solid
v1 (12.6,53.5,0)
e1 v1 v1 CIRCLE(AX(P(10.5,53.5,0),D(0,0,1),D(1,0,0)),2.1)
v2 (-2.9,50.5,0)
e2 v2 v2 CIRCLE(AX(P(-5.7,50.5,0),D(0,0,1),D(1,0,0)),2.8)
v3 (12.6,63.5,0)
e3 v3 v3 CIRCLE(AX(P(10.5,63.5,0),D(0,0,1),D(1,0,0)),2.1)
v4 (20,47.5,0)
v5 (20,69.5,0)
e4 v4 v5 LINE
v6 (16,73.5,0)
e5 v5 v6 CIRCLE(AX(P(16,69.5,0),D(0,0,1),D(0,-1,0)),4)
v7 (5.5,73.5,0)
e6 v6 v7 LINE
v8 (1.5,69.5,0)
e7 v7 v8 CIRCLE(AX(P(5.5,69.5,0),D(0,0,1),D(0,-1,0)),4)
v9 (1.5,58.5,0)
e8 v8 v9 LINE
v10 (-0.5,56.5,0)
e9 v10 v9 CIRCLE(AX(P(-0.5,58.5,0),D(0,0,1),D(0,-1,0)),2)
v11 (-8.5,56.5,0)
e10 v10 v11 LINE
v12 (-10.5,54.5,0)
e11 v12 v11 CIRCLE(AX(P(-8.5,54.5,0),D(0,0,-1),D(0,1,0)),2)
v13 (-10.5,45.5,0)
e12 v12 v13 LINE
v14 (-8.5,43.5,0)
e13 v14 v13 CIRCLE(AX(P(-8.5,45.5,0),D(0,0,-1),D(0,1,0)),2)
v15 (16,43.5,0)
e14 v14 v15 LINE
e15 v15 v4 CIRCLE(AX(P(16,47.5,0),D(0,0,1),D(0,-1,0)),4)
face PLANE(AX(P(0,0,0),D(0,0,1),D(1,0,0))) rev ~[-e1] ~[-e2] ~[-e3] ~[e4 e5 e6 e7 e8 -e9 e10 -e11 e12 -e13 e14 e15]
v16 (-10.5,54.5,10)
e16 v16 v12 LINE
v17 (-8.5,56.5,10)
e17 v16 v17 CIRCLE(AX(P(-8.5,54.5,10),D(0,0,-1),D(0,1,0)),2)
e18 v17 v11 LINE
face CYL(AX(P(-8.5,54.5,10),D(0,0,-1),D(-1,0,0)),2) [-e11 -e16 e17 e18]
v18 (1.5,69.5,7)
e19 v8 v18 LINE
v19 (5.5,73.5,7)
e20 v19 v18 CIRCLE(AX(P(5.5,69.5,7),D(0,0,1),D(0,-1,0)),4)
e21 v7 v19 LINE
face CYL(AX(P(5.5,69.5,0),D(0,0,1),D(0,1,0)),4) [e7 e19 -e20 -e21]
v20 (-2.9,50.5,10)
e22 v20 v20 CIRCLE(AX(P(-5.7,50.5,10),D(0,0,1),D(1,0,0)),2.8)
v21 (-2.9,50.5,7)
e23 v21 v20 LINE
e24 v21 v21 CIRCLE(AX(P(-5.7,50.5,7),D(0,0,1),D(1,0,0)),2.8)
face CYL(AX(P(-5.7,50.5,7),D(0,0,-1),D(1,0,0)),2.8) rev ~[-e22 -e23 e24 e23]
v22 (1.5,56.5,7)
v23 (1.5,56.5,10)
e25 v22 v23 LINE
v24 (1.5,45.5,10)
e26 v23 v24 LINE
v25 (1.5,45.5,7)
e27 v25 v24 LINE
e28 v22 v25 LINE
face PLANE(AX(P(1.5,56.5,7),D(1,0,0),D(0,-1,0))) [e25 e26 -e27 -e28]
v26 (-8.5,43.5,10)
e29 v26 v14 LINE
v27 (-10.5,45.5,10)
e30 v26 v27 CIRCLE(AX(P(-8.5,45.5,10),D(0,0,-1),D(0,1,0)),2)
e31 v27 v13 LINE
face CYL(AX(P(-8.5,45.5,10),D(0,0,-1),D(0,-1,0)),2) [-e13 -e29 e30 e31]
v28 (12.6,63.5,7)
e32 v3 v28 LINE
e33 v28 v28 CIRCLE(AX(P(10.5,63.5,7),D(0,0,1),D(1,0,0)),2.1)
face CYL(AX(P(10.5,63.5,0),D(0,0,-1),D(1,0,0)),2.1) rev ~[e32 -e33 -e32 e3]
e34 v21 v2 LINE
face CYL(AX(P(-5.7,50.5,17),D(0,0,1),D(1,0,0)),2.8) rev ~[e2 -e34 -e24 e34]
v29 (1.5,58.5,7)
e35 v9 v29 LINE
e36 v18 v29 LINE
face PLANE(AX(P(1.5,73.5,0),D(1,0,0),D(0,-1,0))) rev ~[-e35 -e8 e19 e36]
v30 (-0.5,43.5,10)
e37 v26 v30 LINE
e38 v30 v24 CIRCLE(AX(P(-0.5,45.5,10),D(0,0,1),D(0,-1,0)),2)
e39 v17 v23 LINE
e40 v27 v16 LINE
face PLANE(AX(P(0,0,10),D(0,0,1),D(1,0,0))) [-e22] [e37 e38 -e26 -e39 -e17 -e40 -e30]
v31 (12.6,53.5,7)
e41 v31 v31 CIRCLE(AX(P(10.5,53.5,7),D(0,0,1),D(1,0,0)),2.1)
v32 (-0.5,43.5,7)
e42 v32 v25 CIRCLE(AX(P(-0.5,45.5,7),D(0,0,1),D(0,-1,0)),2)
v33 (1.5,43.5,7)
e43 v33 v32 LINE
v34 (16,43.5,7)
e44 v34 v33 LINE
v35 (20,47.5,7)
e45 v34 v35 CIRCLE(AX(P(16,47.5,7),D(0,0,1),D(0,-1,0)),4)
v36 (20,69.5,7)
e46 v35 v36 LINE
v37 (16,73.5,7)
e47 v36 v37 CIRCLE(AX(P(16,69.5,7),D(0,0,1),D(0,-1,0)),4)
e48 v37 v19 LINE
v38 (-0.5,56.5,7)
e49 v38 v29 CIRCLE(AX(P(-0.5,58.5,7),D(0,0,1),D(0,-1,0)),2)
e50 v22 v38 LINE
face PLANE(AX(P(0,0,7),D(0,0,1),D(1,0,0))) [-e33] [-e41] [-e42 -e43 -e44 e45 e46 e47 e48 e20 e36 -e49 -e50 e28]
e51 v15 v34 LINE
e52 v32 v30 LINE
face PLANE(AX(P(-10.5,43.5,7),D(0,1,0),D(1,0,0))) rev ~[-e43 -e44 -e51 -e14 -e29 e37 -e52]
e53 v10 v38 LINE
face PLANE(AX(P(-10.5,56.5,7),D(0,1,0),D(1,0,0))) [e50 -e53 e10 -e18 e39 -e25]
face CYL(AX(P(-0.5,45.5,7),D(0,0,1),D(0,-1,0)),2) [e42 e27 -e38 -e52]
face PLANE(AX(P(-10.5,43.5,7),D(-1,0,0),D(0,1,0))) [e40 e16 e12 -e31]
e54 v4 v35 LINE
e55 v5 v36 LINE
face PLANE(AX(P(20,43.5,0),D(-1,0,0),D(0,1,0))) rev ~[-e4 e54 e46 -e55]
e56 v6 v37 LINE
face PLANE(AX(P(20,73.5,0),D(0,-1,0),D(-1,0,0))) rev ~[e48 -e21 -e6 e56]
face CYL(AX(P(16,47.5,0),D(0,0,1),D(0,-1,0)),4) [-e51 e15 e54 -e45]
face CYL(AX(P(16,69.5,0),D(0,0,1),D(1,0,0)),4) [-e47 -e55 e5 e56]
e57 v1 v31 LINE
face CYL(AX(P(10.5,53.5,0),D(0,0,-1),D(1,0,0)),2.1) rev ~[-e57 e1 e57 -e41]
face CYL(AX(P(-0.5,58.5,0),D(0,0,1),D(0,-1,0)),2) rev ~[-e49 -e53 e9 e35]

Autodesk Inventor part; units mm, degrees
ref_plane "YZ Plane" through (0, 0, 0) normal (1, 0, 0) x (0, 1, 0)
ref_plane "XZ Plane" through (0, 0, 0) normal (0, 1, 0) x (-1, 0, 0)
ref_plane "XY Plane" through (0, 0, 0) normal (0, 0, 1) x (1, 0, 0)
ref_plane "Work Plane1" through (0, 0, 0) normal (0, 0, 1) x (1, 0, 0)
ref_plane "Work Plane2" through (0, 0, 0) normal (0, 0, 1) x (1, 0, 0)
sketch "Sketch6" plane through (0, 0, 0) normal (0, 0, 1) x (1, 0, 0)
  line L0 (20, 33.25) -> (1.5, 33.25) projected
  line L1 (20, 33.25) -> (20, 108.5) projected
  line L2 (1.5, 108.5) -> (20, 108.5) projected
  line L3 (1.5, 33.25) -> (1.5, 44.75) projected
  circle A0 centre (10.5, 63.5) radius 2.1 projected
  circle A1 centre (10.5, 53.5) radius 2.1 projected
  line L4 (20, 73.5) -> (-19.5, 73.5)
  line L5 (-19.5, 73.5) -> (-19.5, 43.5)
  line L6 (-19.5, 43.5) -> (20, 43.5)
  line L7 (20, 43.5) -> (20, 73.5)
  line L8 (-71.5, 45.5) -> (-71.5, 108.5) projected
  line L9 (-19.5, 73.5) -> (1.5, 73.5)
  line L10 (1.5, 73.5) -> (1.5, 56.5)
  line L11 (1.5, 56.5) -> (-19.5, 56.5)
  line L12 (-19.5, 56.5) -> (-19.5, 73.5)
  line L13 (-10.5, 43.5) -> (-19.5, 43.5)
  line L14 (-19.5, 43.5) -> (-19.5, 56.5)
  line L15 (-19.5, 56.5) -> (-10.5, 56.5)
  line L16 (-10.5, 56.5) -> (-10.5, 43.5)
  line L17 (4.5, 44.75) -> (1.5, 44.75) projected
  line L18 (1.5, 56.25) -> (1.5, 108.5) projected
  line L19 (1.5, 56.25) -> (4.5, 56.25) projected
  line L20 (4.5, 56.25) -> (4.5, 44.75) projected
  point P0 (0, 0)
  point P1 (20, 43.5)
  point P2 (-71.5, 60.5)
  point P3 (1.5, 73.5)
  point P4 (1.5, 43.5)
  point P5 (1.5, 73.5)
  point P6 (1.5, 73.5)
  dimension "d28" = 10
  dimension "d29" = 10
  dimension "d92" = 30
  dimension "d94" = 17
  dimension "d95" = 9
extrude "Extrusion5" add sketch "Sketch6" along normal blind 7 contours L6 L3 L17 L20 L19 L18 L10 L4 L1 | L6 L16 L11 L18 L19 L20 L17 L3
ref_plane "Work Plane3" through (0, 0, 22) normal (0, 0, 1) x (1, 0, 0)
ref_plane "Work Plane4" through (0, 0, 17) normal (0, 0, 1) x (1, 0, 0)
sketch "Sketch17" plane through (0, 0, 17) normal (0, 0, 1) x (1, 0, 0)
  line L0 (-13, 58.5) -> (0, 58.5) projected
  line L1 (0, 58.5) -> (0, 88.5) projected
  line L2 (0, 88.5) -> (-13, 88.5) projected
  line L3 (-13, 88.5) -> (-13, 58.5) projected
  circle A0 centre (-5.7, 50.5) radius 2.8
  line L4 (1.5, 56.5) -> (-10.5, 56.5) projected
  line L5 (20, 43.5) -> (20, 73.5) projected
  line L6 (20, 73.5) -> (1.5, 73.5) projected
  line L7 (-10.5, 43.5) -> (20, 43.5) projected
  line L8 (-10.5, 56.5) -> (-10.5, 43.5) projected
  line L9 (1.5, 73.5) -> (1.5, 56.5) projected
  line L10 (1.5, 56.5) -> (-10.5, 56.5) projected
  point P0 (0, 0)
  point P1 (-6.5, 58.5)
  dimension "d75" = 7.3
  dimension "d88" = 5.6
  dimension "d103" = 7
extrude "Extrusion16" cut sketch "Sketch17" against normal through all contours A0
fillet "Fillet8" radius 4 3 edges at (20, 73.5, 3.5) (20, 43.5, 3.5) (1.5, 73.5, 3.5)
sketch "Sketch19" plane through (0, 0, 7) normal (0, 0, 1) x (1, 0, 0)
  line L0 (20, 47.5) -> (20, 69.5) projected
  line L1 (16, 73.5) -> (5.5, 73.5) projected
  line L2 (-10.5, 43.5) -> (16, 43.5) projected
  line L3 (-10.5, 43.5) -> (16, 43.5) projected
  line L4 (-10.5, 56.5) -> (1.5, 56.5)
  line L5 (1.5, 56.5) -> (1.5, 43.5)
  line L6 (1.5, 43.5) -> (-10.5, 43.5)
  line L7 (-10.5, 43.5) -> (-10.5, 56.5)
  circle A0 centre (-5.7, 50.5) radius 2.8 projected
  arc A1 (16, 43.5) -> (20, 47.5) centre (16, 47.5) ccw projected
  arc A2 (20, 69.5) -> (16, 73.5) centre (16, 69.5) ccw projected
  line L8 (1.5, 69.5) -> (1.5, 56.5) projected
  line L9 (1.5, 56.5) -> (-10.5, 56.5) projected
  line L10 (-10.5, 56.5) -> (-10.5, 43.5) projected
  arc A3 (5.5, 73.5) -> (1.5, 69.5) centre (5.5, 69.5) ccw projected
  point P0 (0, 0)
  point P1 (1.5, 43.5)
  point P2 (-15.5, 43.5)
  dimension "d99" = 18.5
extrude "Extrusion18" add sketch "Sketch19" along normal blind 3 contours L2 L7 L4 L5
fillet "Fillet10" radius 2 4 edges at (-10.5, 56.5, 5) (1.5, 43.5, 8.5) (-10.5, 43.5, 5) (1.5, 56.5, 3.5)
properties part number "base-tensioner_3DPrint"
